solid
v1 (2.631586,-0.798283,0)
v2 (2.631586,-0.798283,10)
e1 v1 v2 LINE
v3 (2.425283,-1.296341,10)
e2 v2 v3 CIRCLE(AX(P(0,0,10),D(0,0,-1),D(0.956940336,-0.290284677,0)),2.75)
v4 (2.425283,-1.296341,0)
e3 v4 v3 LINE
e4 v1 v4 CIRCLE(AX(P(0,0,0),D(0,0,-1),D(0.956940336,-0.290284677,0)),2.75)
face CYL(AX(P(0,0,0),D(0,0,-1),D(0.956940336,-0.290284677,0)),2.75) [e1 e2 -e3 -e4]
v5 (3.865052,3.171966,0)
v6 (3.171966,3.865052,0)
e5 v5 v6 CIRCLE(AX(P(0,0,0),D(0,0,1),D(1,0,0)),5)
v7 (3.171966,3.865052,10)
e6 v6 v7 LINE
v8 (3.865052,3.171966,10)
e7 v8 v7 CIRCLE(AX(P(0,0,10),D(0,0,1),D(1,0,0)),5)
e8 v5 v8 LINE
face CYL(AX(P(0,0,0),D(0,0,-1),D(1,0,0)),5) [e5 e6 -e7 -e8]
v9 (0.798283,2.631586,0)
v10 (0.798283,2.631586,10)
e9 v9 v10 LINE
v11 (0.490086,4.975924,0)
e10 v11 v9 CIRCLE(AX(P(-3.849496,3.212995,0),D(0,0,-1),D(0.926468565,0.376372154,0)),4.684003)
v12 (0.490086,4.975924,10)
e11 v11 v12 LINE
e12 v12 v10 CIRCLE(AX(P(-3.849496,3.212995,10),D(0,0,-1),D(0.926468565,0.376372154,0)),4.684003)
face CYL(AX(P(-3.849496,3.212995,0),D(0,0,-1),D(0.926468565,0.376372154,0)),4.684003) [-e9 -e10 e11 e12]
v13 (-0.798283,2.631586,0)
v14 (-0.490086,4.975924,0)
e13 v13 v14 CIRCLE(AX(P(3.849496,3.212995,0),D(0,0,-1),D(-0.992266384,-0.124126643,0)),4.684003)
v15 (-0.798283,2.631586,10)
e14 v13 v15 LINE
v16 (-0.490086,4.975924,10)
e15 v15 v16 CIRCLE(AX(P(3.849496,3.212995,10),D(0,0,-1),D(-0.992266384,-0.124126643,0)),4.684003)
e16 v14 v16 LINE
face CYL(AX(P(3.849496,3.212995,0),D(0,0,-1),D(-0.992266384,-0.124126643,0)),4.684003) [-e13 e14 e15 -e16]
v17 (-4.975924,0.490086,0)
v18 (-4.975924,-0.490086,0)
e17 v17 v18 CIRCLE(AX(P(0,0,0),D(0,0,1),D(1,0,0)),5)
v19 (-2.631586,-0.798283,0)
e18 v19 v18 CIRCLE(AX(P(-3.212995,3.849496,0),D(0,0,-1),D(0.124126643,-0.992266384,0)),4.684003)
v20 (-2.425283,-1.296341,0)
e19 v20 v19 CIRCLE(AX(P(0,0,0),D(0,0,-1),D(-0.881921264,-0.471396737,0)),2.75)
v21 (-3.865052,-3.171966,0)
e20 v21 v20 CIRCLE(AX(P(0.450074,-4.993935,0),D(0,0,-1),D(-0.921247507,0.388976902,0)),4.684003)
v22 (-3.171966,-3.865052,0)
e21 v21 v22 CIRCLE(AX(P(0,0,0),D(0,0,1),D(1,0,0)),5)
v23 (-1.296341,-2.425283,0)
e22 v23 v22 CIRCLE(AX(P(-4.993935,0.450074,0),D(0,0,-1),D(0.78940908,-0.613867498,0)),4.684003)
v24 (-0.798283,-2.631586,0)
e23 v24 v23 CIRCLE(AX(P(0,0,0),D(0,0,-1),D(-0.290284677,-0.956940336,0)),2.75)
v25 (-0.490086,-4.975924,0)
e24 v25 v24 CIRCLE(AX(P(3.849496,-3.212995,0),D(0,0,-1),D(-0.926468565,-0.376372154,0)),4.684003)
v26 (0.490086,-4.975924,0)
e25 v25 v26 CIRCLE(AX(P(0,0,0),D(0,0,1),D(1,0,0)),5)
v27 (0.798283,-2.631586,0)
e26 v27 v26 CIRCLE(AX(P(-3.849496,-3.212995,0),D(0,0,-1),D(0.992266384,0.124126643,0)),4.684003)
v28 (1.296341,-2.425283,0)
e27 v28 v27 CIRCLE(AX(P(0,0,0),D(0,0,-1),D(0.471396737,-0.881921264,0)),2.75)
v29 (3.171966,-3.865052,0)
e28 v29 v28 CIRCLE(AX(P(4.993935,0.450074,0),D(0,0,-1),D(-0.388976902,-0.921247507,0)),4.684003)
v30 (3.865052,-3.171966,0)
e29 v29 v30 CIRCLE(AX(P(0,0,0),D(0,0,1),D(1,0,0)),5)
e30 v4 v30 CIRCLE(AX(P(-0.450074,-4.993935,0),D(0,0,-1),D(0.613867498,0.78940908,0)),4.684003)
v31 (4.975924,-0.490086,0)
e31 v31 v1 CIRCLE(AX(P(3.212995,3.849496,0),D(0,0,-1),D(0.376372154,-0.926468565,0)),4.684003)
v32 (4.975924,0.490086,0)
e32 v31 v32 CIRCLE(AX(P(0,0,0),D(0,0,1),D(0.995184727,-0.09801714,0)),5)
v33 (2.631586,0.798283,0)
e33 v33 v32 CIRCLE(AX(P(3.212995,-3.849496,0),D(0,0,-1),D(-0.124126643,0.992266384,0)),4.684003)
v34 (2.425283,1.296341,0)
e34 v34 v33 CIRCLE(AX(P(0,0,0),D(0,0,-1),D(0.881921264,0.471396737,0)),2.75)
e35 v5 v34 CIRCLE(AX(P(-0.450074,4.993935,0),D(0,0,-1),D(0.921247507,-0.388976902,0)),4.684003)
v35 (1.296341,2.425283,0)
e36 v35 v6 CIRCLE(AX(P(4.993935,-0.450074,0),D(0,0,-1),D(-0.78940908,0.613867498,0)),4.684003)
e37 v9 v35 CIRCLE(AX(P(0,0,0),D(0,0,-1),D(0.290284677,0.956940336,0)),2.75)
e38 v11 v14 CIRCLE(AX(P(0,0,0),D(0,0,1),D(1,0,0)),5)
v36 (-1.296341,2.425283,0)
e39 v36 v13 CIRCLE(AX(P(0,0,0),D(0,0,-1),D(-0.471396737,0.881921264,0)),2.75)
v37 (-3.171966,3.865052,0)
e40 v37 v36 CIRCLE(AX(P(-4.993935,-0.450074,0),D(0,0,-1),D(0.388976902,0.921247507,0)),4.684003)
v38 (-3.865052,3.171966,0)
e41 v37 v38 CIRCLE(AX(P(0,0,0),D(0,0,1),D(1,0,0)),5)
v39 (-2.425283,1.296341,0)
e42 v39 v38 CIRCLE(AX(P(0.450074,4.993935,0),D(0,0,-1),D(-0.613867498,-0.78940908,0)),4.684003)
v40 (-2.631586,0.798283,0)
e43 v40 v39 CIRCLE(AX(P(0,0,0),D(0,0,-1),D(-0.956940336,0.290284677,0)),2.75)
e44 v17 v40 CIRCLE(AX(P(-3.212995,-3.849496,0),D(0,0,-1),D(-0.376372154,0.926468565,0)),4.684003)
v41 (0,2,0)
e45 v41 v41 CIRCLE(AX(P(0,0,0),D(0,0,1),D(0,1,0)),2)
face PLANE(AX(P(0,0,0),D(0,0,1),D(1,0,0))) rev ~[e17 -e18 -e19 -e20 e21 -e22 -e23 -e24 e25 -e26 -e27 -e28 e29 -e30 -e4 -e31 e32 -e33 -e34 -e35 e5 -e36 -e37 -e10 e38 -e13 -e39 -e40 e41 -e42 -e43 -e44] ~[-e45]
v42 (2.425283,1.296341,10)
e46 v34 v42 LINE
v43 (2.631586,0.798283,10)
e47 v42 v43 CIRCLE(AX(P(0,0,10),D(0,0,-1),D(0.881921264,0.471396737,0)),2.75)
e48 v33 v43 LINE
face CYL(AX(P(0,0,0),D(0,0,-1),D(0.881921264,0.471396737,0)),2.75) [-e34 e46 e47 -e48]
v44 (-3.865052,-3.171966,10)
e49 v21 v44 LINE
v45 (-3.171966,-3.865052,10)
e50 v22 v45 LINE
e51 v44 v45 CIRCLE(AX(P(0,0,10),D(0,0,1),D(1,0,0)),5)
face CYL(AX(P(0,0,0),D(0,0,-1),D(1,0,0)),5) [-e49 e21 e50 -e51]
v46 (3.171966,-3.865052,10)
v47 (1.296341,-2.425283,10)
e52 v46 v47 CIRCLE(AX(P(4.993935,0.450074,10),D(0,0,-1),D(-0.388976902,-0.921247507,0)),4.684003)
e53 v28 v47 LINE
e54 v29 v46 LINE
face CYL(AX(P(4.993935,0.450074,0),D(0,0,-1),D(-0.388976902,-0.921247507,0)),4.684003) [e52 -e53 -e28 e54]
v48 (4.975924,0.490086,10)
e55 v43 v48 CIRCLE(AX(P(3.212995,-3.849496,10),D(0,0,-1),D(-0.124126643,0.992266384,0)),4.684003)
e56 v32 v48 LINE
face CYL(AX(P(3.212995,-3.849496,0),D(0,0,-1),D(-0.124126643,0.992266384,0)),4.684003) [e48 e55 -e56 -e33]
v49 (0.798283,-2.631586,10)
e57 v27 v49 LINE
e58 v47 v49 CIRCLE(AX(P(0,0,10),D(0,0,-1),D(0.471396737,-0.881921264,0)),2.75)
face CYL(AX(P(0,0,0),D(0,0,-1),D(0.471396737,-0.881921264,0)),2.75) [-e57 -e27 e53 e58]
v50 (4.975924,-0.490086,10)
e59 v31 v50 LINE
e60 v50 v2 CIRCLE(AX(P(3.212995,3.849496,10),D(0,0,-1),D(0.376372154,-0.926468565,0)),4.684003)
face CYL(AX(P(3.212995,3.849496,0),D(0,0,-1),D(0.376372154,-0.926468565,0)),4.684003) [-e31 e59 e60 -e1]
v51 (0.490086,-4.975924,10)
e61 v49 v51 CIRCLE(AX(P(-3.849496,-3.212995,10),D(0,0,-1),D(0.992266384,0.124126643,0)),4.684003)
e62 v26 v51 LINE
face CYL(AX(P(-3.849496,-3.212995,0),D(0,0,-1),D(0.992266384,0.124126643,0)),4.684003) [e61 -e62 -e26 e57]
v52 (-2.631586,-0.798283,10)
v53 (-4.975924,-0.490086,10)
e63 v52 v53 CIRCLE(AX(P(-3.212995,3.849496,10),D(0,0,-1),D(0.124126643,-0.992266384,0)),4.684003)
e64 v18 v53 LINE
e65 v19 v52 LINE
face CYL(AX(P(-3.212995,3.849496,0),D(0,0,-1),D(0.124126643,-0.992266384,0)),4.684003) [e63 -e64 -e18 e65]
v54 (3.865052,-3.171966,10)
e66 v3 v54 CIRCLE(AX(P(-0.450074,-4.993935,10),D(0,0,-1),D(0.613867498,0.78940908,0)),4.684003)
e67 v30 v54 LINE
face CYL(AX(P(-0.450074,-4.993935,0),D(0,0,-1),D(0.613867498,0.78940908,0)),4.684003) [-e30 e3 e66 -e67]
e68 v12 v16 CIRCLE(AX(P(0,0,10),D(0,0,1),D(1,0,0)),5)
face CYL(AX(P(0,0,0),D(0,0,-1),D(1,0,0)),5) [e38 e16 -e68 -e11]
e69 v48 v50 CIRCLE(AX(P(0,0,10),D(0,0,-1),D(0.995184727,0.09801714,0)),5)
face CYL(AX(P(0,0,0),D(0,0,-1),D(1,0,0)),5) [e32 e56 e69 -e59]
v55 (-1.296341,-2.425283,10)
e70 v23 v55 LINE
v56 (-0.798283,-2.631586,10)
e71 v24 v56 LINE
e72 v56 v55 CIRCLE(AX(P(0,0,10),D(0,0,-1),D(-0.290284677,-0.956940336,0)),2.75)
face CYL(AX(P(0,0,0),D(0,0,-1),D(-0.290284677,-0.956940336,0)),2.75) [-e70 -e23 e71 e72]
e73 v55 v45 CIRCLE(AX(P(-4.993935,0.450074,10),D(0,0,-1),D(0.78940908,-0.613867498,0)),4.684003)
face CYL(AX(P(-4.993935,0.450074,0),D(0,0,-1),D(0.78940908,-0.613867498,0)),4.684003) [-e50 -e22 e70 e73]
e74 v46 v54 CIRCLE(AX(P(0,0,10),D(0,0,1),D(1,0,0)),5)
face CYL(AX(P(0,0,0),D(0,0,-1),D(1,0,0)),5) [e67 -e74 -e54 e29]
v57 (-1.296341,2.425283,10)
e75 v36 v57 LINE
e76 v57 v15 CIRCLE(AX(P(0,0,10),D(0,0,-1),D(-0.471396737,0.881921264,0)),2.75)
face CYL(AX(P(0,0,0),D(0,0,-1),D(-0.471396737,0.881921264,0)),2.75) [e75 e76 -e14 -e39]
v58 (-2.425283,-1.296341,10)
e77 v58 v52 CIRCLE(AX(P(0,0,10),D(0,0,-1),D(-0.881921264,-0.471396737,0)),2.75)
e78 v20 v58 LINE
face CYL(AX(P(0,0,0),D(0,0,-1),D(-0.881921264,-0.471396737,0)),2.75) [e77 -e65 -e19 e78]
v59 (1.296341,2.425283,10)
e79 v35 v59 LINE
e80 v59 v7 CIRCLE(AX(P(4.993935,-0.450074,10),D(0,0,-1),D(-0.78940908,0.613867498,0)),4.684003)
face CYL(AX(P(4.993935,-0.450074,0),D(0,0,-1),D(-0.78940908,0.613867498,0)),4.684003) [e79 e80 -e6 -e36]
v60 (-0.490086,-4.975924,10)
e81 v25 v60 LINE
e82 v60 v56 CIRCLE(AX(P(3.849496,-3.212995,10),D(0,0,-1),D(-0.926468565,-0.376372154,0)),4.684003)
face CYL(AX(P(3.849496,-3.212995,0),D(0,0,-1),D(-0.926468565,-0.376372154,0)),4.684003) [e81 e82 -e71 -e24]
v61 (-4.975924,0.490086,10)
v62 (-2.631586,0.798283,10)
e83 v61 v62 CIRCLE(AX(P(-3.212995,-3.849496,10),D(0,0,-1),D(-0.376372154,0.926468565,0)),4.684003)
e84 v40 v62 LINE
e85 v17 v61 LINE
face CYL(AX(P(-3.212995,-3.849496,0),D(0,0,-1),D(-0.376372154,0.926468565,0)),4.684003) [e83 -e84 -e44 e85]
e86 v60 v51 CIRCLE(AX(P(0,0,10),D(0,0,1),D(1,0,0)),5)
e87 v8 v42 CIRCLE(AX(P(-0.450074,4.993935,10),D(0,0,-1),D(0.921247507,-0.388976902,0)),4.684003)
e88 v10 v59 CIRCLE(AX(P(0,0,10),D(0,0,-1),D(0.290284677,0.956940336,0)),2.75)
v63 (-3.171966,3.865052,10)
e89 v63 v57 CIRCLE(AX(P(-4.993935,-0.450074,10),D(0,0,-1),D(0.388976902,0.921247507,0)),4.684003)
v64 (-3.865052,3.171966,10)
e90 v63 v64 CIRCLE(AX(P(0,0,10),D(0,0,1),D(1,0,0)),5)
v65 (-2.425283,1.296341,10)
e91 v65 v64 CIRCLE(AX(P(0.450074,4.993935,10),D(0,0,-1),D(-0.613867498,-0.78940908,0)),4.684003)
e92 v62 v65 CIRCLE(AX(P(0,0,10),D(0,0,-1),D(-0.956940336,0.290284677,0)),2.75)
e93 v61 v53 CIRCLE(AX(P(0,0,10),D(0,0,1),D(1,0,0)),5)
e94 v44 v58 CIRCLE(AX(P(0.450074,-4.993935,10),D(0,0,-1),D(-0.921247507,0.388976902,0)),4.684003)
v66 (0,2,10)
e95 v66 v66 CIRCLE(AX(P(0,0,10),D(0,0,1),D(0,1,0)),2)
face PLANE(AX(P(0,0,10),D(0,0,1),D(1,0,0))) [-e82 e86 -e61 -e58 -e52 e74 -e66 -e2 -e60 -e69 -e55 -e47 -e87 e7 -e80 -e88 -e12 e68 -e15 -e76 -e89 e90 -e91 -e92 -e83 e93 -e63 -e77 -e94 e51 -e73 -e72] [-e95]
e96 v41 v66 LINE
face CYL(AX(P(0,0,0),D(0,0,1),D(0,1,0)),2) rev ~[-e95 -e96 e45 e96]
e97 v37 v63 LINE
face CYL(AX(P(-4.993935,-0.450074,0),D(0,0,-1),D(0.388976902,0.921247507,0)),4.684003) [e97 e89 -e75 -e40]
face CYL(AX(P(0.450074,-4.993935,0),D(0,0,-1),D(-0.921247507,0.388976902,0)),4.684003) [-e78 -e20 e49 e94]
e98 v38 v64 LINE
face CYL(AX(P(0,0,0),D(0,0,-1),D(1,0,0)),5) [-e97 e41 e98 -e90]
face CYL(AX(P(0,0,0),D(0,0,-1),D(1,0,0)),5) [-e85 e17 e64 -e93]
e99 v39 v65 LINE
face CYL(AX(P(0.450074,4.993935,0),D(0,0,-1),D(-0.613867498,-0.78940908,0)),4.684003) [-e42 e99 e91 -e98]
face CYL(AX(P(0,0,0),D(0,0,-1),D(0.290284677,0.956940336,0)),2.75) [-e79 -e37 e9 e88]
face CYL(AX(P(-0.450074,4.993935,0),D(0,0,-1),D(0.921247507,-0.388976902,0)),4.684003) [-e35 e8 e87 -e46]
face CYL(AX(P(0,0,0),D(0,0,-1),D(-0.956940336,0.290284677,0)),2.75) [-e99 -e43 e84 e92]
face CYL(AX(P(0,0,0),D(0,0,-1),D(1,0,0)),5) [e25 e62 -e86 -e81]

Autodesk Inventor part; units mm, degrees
sketch "Sketch1" plane through (0, 0, 0) normal (0, 0, 1) x (1, 0, 0)
  circle A0 centre (0, 0) radius 5
  dimension "d0" = 10
extrude "Extrusion1" add sketch "Sketch1" along normal blind 10
ref_plane "Work Plane2" through (0, 0, 5) normal (0, 0, 1) x (1, 0, 0)
sketch "Sketch2" plane through (0, 0, 0) normal (0, 0, -1) x (-1, 0, 0)
  circle A0 centre (0, 0) radius 5 projected
  circle A1 centre (0, 0) radius 4
  dimension "d3" = 8
surface extrude "Pitch Diameter" sketch "Sketch2" against normal through all shown no curves A1
ref_plane "Work Plane8" through (0, 0, 0) normal (0.9238795, 0.3826834, 0) x (0, 0, 1)
ref_plane "Work Plane9" through (0, 0, 0) normal (1, 0, 0) x (0, 1, 0)
spur gear teeth "Spur Gear" teeth 8 pitch diameter 8 tip diameter 10 root diameter 5.5 face width 10 start plane through (0, 0, 0) normal (0, 0, -1) x (-1, 0, 0)
sketch "Sketch3" plane through (0, 0, 0) normal (0, 0, -1) x (-1, 0, 0)
  point P0 (0, 0)
  point P1 (0, 0)
hole "Hole1" at (0, 0, 0) direction (0, 0, 1) diameter 4 end through all
equation "\"d0\" = da_da"
equation "\"d1\" = da_b"
equation "\"d3\" = da_d"
equation "\"d16\" = da_aw"
equation "\"d43\" = da_aw"
equation "\"d46\" = da_aw"
equation "\"da_da\" = 10"
equation "\"da_b\" = 10"
equation "\"da_d\" = 8"
equation "\"da_aw\" = 19"
properties part number "Spur Gear1" material "Steel"
